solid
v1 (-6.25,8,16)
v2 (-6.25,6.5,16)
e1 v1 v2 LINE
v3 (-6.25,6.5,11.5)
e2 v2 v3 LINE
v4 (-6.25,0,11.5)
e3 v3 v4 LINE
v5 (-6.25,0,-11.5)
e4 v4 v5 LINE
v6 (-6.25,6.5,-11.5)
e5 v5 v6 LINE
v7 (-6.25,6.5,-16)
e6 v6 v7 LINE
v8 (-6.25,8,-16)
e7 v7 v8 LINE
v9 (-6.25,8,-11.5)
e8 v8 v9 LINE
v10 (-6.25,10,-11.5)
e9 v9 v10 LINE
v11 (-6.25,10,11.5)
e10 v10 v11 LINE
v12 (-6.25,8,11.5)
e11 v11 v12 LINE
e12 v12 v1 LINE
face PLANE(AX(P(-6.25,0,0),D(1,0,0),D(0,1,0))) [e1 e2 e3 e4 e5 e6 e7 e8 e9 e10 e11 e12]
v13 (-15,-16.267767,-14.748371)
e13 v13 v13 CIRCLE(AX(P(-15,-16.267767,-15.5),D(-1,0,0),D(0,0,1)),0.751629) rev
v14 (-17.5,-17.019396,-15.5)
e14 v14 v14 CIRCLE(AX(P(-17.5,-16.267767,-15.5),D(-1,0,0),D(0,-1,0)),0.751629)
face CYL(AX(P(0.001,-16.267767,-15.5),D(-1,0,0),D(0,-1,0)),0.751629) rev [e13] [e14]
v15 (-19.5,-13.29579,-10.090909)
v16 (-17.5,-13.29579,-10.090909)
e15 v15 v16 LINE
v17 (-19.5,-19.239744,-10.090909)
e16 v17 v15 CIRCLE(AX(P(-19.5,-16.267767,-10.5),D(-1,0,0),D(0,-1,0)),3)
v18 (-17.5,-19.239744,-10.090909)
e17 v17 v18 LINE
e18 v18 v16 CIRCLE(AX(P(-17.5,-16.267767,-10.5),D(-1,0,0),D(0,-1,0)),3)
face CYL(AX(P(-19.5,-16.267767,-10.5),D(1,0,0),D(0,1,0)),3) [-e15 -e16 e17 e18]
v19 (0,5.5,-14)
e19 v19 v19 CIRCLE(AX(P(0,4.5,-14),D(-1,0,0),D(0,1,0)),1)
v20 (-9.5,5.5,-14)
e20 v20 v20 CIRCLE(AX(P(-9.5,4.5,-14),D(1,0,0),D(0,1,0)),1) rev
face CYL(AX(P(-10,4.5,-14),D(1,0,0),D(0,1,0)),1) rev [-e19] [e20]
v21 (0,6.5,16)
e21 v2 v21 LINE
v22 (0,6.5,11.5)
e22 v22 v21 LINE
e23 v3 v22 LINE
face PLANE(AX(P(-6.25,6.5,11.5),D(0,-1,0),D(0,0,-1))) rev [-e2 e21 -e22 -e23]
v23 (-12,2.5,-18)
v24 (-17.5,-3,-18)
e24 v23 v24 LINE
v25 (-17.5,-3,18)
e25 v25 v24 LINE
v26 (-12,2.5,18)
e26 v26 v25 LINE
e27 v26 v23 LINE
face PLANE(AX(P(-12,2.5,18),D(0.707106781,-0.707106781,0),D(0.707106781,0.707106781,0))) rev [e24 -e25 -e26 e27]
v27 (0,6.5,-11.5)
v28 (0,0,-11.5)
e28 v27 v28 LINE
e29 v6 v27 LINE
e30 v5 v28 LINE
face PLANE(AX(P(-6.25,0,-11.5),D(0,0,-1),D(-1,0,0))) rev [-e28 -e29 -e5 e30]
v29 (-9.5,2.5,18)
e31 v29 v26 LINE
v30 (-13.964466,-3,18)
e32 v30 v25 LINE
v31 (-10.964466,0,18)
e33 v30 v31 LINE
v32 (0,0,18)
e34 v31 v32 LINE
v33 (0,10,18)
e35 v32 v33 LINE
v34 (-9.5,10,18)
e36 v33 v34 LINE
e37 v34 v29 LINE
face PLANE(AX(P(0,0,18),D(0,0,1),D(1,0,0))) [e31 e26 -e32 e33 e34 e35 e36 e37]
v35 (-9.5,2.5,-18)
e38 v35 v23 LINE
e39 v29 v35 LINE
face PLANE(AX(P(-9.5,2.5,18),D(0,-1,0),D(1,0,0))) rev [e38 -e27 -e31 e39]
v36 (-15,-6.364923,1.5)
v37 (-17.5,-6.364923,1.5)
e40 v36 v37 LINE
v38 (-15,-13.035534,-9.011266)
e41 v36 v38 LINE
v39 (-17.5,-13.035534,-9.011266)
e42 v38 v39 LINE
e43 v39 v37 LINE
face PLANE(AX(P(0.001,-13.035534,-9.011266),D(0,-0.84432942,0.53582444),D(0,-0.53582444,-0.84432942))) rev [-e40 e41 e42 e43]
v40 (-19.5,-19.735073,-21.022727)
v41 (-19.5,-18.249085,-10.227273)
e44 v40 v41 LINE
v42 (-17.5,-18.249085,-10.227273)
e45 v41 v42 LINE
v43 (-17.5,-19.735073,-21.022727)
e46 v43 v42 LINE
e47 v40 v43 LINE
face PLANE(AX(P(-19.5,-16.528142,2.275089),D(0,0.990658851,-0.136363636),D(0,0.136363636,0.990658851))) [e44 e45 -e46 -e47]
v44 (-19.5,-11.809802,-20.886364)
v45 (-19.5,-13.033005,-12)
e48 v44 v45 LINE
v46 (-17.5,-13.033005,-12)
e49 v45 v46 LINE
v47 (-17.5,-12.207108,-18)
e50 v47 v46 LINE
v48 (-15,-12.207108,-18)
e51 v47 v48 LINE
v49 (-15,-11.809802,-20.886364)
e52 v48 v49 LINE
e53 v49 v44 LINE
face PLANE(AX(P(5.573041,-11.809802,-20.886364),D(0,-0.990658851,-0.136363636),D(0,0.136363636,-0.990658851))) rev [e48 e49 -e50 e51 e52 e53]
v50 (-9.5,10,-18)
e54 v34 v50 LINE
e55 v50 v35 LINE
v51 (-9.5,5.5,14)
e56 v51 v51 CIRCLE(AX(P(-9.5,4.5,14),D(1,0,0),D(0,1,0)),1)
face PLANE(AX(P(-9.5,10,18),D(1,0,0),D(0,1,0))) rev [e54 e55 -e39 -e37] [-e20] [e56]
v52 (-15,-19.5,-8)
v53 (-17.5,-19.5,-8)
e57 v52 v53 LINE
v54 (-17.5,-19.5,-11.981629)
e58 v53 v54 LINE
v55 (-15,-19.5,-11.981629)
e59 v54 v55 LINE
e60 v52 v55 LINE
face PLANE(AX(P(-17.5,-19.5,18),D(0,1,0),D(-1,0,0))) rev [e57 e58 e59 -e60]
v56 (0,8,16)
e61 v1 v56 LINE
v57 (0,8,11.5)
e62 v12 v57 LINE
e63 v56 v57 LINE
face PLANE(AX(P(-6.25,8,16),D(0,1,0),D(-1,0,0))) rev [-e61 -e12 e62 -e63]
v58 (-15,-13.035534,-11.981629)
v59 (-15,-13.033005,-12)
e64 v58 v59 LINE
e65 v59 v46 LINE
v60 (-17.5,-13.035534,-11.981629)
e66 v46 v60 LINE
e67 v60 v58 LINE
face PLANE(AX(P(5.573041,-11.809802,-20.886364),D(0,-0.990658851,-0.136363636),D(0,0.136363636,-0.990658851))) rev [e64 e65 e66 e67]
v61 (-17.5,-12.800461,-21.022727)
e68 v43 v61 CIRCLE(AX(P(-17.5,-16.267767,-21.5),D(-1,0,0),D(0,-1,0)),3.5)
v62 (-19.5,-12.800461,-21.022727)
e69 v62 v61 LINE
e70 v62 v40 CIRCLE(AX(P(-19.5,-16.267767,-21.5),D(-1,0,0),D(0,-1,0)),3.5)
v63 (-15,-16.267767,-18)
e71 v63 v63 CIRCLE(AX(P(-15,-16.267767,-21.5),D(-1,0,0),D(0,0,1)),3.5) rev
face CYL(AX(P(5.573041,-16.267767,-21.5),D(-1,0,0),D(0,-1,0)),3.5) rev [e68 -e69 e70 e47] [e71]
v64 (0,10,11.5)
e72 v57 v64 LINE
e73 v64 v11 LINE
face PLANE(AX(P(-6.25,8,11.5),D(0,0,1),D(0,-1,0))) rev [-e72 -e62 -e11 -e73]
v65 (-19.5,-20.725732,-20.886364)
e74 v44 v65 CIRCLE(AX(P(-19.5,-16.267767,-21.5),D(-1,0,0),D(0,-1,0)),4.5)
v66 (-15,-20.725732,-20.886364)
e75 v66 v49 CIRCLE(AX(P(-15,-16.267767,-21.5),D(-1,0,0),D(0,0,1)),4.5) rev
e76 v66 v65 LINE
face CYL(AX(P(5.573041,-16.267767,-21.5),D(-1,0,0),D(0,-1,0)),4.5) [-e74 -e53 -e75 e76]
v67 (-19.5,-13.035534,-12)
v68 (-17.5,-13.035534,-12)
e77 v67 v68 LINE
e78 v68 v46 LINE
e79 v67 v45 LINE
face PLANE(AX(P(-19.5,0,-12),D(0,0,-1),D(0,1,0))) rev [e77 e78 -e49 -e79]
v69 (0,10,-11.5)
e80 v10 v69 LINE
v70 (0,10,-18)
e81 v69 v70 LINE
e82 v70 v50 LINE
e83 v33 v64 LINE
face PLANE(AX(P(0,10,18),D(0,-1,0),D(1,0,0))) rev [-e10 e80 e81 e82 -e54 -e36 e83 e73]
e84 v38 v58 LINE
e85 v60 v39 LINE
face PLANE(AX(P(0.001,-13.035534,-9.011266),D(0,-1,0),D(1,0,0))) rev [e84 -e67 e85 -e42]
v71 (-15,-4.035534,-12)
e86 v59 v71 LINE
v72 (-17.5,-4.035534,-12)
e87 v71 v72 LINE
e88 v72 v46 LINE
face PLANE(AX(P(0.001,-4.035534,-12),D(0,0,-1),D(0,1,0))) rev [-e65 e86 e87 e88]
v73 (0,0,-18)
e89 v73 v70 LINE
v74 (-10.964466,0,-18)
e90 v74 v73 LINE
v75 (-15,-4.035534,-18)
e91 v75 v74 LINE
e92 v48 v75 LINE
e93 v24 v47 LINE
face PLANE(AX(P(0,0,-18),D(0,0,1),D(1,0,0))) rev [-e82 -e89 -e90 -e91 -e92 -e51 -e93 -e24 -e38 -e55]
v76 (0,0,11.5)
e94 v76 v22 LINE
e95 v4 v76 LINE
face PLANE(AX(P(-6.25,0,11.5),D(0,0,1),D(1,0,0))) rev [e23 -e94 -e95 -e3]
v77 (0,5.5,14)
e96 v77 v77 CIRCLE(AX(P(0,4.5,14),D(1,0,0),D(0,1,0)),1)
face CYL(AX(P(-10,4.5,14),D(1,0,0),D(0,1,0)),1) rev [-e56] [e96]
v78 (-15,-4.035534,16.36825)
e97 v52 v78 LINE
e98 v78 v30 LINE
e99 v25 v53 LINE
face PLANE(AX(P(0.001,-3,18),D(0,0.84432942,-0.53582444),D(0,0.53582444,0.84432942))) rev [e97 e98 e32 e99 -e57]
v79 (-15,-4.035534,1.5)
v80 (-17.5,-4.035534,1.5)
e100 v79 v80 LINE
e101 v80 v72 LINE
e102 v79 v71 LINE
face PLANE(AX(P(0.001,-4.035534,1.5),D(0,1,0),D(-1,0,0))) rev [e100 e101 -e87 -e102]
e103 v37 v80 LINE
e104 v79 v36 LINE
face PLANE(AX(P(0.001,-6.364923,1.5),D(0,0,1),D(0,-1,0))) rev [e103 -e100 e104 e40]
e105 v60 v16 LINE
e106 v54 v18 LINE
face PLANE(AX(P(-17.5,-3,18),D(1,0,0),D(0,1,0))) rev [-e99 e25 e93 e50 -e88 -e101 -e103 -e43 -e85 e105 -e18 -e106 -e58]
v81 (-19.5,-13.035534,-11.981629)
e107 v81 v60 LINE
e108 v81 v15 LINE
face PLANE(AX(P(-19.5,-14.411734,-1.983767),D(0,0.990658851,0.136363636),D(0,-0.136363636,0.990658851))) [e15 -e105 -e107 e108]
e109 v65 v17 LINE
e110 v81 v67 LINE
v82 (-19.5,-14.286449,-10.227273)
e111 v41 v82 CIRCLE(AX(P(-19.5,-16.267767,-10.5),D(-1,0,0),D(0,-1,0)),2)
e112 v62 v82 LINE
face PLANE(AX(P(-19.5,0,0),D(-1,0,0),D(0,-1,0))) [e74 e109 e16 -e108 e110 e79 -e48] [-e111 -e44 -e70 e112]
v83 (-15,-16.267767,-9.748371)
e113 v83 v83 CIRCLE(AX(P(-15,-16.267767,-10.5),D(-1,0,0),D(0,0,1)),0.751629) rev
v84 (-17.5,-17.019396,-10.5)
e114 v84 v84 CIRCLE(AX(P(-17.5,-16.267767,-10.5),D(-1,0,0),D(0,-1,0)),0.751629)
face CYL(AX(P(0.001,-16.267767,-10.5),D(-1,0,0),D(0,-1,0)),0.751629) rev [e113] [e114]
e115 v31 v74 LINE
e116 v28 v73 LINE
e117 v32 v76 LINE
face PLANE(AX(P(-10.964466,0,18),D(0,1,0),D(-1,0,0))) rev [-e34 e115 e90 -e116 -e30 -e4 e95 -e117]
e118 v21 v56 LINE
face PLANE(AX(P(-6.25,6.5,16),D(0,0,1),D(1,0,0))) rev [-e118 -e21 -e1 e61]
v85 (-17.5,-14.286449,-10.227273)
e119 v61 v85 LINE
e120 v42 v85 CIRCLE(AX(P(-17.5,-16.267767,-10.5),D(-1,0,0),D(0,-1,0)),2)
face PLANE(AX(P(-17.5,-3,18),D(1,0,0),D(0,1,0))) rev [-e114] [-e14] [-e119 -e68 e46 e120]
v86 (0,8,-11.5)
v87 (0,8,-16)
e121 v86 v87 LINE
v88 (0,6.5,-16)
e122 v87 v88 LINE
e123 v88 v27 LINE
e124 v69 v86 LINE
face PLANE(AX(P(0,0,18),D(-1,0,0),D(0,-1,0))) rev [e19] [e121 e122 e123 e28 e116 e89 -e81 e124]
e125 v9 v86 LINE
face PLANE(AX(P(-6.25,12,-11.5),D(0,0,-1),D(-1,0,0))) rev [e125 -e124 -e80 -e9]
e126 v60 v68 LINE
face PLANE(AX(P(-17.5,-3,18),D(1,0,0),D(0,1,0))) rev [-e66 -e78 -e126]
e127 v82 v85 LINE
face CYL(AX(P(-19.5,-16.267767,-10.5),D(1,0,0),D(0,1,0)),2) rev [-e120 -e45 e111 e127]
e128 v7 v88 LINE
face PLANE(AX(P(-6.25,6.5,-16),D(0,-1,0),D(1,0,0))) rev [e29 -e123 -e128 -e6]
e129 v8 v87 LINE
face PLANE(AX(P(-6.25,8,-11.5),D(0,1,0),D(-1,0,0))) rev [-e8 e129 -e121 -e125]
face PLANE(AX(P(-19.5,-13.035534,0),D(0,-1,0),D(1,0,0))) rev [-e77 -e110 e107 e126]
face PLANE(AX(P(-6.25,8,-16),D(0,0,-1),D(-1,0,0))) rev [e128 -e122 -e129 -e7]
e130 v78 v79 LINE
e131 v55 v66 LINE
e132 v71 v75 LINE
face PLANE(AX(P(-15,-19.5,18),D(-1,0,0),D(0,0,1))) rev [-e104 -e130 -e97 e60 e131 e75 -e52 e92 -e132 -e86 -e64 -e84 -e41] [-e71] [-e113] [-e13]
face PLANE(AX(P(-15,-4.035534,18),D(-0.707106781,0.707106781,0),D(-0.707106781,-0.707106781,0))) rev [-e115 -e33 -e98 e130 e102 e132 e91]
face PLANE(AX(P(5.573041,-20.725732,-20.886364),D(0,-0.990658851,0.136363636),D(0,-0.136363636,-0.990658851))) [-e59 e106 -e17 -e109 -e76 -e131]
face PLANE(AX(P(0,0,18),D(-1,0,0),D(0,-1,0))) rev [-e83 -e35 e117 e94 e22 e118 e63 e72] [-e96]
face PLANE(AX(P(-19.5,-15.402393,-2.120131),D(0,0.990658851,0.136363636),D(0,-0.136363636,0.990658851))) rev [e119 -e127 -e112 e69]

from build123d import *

# Parameters (mm, degrees)
EXTRUDE_1_DEPTH     = 18
CUT_EXTRUDE_1_REACH = 33.788
CUT_EXTRUDE_2_DEPTH = 6.25
SKETCH_4_R          = 1.0000000000000013
CUT_EXTRUDE_3_DEPTH = 10
SKETCH_8_R          = 3.4999999999999996
SKETCH_8_R_2        = 0.751628678477691
SKETCH_8_R_3        = 0.7516286784776927
EXTRUDE_2_DEPTH     = 2.5
EXTRUDE_3_DEPTH     = 2
CUT_EXTRUDE_4_REACH = 39.597
SKETCH_8_4_R        = 0.751628678477691
SKETCH_8_4_R_2      = 0.7516286784776927


# Read off the part's stored shape, not the designer's step: 凸台-拉伸3
with BuildPart() as part:
    # 草图1 → 凸台-拉伸1 (new, symmetric)
    with BuildSketch(Plane.XY):
        Polygon((0, 0), (0, 10), (-9.5, 9.999999999999998), (-9.499999999999998, 2.5000000000000004), (-11.999999999999998, 2.5), (-17.499999999999996, -3.0000000000000218), (-17.499999999999996, -19.5), (-14.999999999999995, -19.500000000000004), (-14.999999999999995, -4.035533905932752), (-10.964466094067257, -4e-17), align=None)
    extrude(amount=EXTRUDE_1_DEPTH, both=True)

    # 草图2 → 切除-拉伸1 (cut, up to next)
    with BuildSketch(Plane.ZY.offset(17.499999999999996), mode=Mode.PRIVATE) as cut_extrude_1_sk1:
        Polygon((-9.011266099163953, -13.03553390593275), (-11.999999999999996, -13.03553390593275), (-11.999999999999998, -4.035533905932751), (1.5000000000000013, -4.035533905932748), (1.500000000000002, -6.364922727617167), align=None)
    cut_extrude_1_tool1 = extrude(cut_extrude_1_sk1.sketch, amount=-CUT_EXTRUDE_1_REACH, mode=Mode.PRIVATE) & part.part
    # 草图2 → 切除-拉伸1 (cut, up to next)
    with BuildSketch(Plane.ZY.offset(17.499999999999996), mode=Mode.PRIVATE) as cut_extrude_1_sk2:
        Polygon((-7.9999999999999964, -19.499999999999996), (18, -19.49999999999999), (18, -3.000000000000014), align=None)
    cut_extrude_1_tool2 = extrude(cut_extrude_1_sk2.sketch, amount=-CUT_EXTRUDE_1_REACH, mode=Mode.PRIVATE) & part.part
    add(cut_extrude_1_tool1.solids().sort_by_distance((-17.5, -7.612266, -6.566584))[0], mode=Mode.SUBTRACT)
    add(cut_extrude_1_tool2.solids().sort_by_distance((-17.5, -14, 9.333333))[0], mode=Mode.SUBTRACT)

    # 草图3 → 切除-拉伸2 (cut, symmetric)
    with BuildSketch(Plane(origin=(0, 8.89452112858794, -0.8331769279117781), x_dir=(0, -1, 0), z_dir=(1, 0, 0))):
        Polygon((2.3945211285879346, 15.166823072088224), (2.3945211285879346, 10.666823072088222), (8.894521128587936, 10.666823072088222), (8.894521128587936, -12.333176927911778), (2.394521128587931, -12.333176927911778), (2.3945211285879346, -16.833176927911776), (0.8945211285879351, -16.833176927911776), (0.8945211285879351, -12.33317692791178), (-3.1054788714120676, -12.333176927911778), (-3.105478871412064, 10.66682307208822), (0.8945211285879369, 10.66682307208822), (0.8945211285879351, 15.166823072088224), align=None)
    extrude(amount=CUT_EXTRUDE_2_DEPTH, both=True, mode=Mode.SUBTRACT)

    # 草图4 → 切除-拉伸3 (cut)
    with BuildSketch(Plane(origin=(0, 0, 0), x_dir=(0, 0, -1), z_dir=(1, 0, 0))):
        with Locations(Location((-14, 4.500000000000008, 0), (0, 0, 90))):
            Circle(SKETCH_4_R)
    cut_extrude_3 = extrude(amount=-CUT_EXTRUDE_3_DEPTH, mode=Mode.SUBTRACT)

    # 镜向1: 切除-拉伸3 across plane
    add(cut_extrude_3.mirror(Plane.XY), mode=Mode.SUBTRACT)

    # 草图8 → 凸台-拉伸2 (add)
    with BuildSketch(Plane.ZY.offset(17.499999999999996)):
        with BuildLine():
            Line((-20.886363636363633, -11.809802124345238), (-10.090909090909088, -13.295790400552288))
            ThreePointArc((-10.090909090909088, -13.295790400552288), (-7.50000000000001, -16.26776695296638), (-10.090909090909088, -19.239743505380464))
            Line((-10.090909090909088, -19.239743505380464), (-20.886363636363633, -20.725731781587513))
            ThreePointArc((-20.886363636363633, -20.725731781587513), (-25.999999999999996, -16.267766952966376), (-20.886363636363633, -11.809802124345238))
        make_face()
        with Locations(Location((-21.5, -16.267766952966376, 0), (0, 0, 270))):
            Circle(SKETCH_8_R, mode=Mode.SUBTRACT)
        with Locations((-15.499999999999998, -16.267766952966372)):
            Circle(SKETCH_8_R_2, mode=Mode.SUBTRACT)
        with Locations((-10.499999999999998, -16.26776695296638)):
            Circle(SKETCH_8_R_3, mode=Mode.SUBTRACT)
    extrude(amount=-EXTRUDE_2_DEPTH)

    # 凸台-拉伸3 outline → 凸台-拉伸3 (add)
    with BuildSketch(Plane.ZY.offset(17.499999999999996)):
        with BuildLine():
            Line((-11.98162869, -13.035533906), (-12, -13.035533906))
            Line((-12, -13.035533906), (-12, -13.033005105))
            Line((-12, -13.033005105), (-20.886363636, -11.809802124))
            ThreePointArc((-20.886363636, -11.809802124), (-26, -16.267766953), (-20.886363636, -20.725731782))
            Line((-20.886363636, -20.725731782), (-10.090909091, -19.239743505))
            ThreePointArc((-10.090909091, -19.239743505), (-7.5, -16.267766953), (-10.090909091, -13.295790401))
            Line((-10.090909091, -13.295790401), (-11.98162869, -13.035533906))
        make_face()
        with BuildLine():
            ThreePointArc((-21.022727273, -19.735072931), (-25, -16.267766953), (-21.022727273, -12.800460975))
            Line((-21.022727273, -12.800460975), (-10.227272727, -14.286449251))
            ThreePointArc((-10.227272727, -14.286449251), (-8.5, -16.267766953), (-10.227272727, -18.249084655))
            Line((-10.227272727, -18.249084655), (-21.022727273, -19.735072931))
        make_face(mode=Mode.SUBTRACT)
    extrude(amount=EXTRUDE_3_DEPTH)

    # 草图8<4> → 切除-拉伸4 (cut, up to next)
    with BuildSketch(Plane.ZY.offset(17.499999999999996), mode=Mode.PRIVATE) as cut_extrude_4_sk1:
        with Locations(Location((-15.499999999999998, -16.267766952966372, 0), (0, 0, 270))):
            Circle(SKETCH_8_4_R)
    cut_extrude_4_tool1 = extrude(cut_extrude_4_sk1.sketch, amount=-CUT_EXTRUDE_4_REACH, mode=Mode.PRIVATE) & part.part
    # 草图8<4> → 切除-拉伸4 (cut, up to next)
    with BuildSketch(Plane.ZY.offset(17.499999999999996), mode=Mode.PRIVATE) as cut_extrude_4_sk2:
        with Locations(Location((-10.499999999999998, -16.26776695296638, 0), (0, 0, 270))):
            Circle(SKETCH_8_4_R_2)
    cut_extrude_4_tool2 = extrude(cut_extrude_4_sk2.sketch, amount=-CUT_EXTRUDE_4_REACH, mode=Mode.PRIVATE) & part.part
    add(cut_extrude_4_tool1.solids().sort_by_distance((-17.5, -16.267767, -15.5))[0], mode=Mode.SUBTRACT)
    add(cut_extrude_4_tool2.solids().sort_by_distance((-17.5, -16.267767, -10.5))[0], mode=Mode.SUBTRACT)


solid = part.part
